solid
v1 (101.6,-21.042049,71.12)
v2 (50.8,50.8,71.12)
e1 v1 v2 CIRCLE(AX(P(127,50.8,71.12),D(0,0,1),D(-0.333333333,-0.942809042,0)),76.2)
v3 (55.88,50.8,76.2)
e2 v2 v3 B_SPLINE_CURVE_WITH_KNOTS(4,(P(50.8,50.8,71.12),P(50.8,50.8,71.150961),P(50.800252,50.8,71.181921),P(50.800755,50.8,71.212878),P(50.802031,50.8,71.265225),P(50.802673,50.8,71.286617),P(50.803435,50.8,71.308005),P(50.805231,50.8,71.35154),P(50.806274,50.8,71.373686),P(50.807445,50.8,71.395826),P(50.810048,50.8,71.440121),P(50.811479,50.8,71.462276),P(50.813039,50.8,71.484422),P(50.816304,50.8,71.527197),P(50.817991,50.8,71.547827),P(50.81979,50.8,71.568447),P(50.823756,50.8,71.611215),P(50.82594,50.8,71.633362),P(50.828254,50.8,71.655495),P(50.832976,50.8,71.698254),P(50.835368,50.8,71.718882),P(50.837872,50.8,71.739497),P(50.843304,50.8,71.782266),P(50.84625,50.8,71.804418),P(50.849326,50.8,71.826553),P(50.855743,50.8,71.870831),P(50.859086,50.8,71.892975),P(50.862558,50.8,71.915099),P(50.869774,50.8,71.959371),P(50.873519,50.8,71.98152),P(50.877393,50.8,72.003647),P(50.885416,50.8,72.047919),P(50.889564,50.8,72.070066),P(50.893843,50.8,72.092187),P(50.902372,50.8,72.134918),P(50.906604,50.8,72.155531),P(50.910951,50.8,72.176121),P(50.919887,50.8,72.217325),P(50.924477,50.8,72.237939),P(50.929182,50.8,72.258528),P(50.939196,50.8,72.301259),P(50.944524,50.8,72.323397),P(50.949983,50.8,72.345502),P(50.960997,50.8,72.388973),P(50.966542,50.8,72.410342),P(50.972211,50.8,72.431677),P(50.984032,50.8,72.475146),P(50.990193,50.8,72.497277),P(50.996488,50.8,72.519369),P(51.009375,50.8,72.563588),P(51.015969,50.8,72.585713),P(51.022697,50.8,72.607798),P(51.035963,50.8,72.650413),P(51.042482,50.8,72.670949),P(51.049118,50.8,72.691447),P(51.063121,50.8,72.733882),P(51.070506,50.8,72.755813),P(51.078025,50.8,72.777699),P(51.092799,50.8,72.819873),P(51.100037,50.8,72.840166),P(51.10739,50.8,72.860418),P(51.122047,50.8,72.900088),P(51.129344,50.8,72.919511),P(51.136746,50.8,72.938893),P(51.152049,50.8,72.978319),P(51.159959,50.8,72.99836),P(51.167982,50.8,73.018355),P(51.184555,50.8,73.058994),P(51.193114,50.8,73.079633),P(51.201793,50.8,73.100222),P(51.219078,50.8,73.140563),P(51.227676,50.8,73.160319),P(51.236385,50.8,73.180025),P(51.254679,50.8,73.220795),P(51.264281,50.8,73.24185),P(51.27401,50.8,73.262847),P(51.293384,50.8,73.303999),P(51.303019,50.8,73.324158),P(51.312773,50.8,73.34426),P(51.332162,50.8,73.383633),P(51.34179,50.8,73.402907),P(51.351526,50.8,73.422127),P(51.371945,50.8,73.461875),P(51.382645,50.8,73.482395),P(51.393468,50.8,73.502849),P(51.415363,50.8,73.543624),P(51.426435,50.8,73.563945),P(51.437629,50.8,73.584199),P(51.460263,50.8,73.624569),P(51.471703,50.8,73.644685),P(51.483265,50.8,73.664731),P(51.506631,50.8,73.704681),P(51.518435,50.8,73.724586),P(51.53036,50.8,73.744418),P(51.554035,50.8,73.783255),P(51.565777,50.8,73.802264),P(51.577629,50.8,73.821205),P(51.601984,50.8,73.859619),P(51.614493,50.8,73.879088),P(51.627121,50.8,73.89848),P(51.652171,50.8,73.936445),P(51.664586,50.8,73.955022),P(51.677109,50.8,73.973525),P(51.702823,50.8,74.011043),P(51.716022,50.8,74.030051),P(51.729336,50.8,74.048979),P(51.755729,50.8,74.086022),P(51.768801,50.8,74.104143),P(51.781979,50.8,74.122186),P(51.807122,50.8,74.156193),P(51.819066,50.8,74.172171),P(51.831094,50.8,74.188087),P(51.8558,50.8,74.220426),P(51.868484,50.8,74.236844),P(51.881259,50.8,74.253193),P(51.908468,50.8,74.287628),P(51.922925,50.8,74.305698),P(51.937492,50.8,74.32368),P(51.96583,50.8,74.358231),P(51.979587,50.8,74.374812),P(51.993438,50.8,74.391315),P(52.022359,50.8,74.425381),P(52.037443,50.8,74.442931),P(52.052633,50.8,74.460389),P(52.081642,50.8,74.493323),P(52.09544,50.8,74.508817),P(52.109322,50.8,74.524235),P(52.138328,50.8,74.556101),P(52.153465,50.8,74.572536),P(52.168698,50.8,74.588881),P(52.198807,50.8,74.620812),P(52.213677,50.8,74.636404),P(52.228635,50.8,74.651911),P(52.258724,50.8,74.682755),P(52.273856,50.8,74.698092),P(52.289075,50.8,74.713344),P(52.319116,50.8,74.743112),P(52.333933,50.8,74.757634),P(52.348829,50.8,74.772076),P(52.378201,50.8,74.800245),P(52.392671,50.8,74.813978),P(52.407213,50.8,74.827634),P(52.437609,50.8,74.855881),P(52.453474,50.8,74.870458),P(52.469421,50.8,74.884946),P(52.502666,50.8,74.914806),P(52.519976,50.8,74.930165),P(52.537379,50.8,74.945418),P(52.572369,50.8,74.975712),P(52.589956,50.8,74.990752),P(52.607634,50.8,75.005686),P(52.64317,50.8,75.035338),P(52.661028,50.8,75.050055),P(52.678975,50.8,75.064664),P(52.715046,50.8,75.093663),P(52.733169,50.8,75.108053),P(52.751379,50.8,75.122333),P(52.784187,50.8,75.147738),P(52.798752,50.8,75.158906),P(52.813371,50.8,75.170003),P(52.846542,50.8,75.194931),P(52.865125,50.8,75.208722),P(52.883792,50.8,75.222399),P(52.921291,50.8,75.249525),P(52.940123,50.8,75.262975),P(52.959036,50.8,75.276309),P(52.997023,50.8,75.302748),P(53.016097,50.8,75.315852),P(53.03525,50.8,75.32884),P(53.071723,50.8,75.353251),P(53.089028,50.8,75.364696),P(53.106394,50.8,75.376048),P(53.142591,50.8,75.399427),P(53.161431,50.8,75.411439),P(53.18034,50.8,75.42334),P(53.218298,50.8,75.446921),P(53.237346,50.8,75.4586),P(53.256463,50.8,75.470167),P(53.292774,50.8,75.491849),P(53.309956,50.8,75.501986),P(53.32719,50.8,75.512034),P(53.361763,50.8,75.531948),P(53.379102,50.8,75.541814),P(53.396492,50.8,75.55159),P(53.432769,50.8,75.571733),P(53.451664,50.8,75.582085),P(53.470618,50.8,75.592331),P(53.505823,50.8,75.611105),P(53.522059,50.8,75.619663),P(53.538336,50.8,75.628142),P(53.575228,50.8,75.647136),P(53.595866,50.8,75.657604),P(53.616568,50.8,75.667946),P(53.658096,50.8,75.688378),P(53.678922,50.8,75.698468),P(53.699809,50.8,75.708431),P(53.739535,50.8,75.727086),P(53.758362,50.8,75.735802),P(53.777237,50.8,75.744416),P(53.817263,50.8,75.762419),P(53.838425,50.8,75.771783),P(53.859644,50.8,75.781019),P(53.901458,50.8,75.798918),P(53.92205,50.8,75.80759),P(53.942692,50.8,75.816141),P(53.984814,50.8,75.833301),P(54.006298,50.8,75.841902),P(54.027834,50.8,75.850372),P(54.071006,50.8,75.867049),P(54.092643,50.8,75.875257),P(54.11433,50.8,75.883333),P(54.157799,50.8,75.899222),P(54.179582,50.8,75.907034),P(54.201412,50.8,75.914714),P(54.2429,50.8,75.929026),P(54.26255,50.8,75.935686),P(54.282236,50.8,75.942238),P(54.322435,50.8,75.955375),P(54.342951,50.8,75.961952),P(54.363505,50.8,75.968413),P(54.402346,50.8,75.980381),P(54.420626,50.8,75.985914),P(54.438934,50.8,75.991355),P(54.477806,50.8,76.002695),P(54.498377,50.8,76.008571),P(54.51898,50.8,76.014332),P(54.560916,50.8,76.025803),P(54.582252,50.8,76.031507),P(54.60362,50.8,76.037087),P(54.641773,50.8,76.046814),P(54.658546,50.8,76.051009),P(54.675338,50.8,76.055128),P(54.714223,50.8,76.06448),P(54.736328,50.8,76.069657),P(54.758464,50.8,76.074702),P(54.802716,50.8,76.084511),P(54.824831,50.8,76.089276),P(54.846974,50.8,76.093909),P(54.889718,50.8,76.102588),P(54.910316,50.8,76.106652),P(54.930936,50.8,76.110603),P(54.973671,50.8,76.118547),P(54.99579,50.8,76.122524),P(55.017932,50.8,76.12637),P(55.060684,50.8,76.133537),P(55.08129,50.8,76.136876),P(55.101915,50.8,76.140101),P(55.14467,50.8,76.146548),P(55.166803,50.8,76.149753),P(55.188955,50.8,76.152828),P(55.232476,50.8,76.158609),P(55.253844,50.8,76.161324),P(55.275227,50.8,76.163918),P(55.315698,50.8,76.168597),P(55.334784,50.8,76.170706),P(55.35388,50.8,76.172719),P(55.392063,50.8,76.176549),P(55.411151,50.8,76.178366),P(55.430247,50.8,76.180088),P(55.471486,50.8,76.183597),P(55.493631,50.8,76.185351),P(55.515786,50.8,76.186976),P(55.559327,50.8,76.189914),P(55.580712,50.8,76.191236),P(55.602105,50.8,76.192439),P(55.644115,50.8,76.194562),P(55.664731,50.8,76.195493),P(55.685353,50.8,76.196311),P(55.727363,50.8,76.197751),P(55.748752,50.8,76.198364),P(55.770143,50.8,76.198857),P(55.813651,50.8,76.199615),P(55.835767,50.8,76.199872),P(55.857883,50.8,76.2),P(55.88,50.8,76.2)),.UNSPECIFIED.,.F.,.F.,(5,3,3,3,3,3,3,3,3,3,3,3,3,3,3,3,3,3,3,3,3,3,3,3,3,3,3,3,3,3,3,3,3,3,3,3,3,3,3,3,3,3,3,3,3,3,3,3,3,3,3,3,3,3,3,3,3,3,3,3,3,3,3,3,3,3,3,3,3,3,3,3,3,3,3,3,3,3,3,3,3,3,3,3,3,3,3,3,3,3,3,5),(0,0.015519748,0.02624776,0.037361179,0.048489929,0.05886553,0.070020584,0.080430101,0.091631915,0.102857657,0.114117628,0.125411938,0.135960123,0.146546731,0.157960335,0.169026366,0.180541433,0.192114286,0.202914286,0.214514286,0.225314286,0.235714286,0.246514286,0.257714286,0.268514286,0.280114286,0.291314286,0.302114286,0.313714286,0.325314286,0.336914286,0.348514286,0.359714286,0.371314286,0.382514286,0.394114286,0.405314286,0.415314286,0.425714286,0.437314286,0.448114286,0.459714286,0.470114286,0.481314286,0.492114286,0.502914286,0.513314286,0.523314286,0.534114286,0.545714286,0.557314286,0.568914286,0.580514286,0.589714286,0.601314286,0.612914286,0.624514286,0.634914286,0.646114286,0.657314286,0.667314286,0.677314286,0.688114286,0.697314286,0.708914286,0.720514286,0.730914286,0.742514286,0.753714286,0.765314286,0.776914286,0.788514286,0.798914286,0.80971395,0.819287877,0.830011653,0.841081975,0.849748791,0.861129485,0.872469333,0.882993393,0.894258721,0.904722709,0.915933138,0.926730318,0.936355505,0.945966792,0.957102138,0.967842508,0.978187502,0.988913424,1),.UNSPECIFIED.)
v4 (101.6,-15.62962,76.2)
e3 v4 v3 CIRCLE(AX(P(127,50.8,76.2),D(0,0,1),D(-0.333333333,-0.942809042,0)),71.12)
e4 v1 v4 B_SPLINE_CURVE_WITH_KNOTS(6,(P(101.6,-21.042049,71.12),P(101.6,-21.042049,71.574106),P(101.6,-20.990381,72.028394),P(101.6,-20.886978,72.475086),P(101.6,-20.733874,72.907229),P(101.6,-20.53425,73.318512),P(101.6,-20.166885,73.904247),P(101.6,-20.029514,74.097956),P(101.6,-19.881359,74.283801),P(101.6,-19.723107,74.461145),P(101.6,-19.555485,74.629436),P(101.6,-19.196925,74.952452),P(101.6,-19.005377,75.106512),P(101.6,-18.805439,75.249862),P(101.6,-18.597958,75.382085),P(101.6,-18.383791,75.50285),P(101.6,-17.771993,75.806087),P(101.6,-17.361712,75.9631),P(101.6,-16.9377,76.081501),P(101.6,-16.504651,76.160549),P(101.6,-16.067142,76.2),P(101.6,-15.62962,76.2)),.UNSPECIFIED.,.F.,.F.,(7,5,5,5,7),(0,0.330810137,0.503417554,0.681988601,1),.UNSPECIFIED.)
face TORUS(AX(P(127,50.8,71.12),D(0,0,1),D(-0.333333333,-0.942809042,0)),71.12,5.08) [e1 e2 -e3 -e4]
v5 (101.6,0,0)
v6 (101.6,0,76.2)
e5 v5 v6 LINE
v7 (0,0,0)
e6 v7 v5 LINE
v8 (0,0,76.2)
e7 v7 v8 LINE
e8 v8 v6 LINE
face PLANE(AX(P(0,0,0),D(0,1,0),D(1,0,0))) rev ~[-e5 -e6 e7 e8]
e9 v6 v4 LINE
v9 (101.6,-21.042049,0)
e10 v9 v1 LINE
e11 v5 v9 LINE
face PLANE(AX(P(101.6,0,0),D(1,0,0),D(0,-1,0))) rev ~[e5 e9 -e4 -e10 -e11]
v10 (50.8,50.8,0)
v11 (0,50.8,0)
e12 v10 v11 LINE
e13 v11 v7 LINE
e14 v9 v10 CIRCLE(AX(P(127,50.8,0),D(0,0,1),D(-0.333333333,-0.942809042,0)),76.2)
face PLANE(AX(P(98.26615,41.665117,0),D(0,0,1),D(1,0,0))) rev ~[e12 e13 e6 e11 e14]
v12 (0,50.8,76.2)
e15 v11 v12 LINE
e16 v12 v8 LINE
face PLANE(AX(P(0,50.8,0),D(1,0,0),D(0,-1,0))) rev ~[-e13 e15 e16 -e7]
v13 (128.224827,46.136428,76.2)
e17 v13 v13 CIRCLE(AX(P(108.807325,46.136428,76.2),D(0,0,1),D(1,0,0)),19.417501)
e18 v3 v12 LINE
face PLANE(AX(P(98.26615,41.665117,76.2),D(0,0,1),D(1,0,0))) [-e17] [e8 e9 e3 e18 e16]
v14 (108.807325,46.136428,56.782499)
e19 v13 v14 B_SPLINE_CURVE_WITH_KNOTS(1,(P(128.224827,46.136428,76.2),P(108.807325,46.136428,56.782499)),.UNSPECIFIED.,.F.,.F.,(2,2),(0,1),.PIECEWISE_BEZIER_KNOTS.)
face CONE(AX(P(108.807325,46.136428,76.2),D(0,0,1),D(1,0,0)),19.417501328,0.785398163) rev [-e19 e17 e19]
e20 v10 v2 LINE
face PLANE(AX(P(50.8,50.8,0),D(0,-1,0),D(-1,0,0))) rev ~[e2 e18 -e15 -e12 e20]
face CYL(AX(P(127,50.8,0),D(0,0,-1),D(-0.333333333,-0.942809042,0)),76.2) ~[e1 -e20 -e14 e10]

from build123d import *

# Parameters (mm, degrees)
F1_DEPTH = 76.2
F2_R     = 5.08
F3_R     = 19.4175013285


# Not quite as in the source:
# - an extrude whose draft closes it to a point is written as a loft to that point


with BuildPart() as f1:
    # F0 (on Top) → F1 (new body)
    with BuildSketch(Plane.XY):
        with BuildLine():
            Line((0, 50.8), (0, 0))
            Line((0, 0), (101.6, 0))
            Line((101.6, 0), (101.6, -21.0420489686))
            ThreePointArc((101.6, -21.0420489686), (189.2170394667, 94.7940905122), (50.8, 50.8))
            Line((50.8, 50.8), (0, 50.8))
        make_face()
    extrude(amount=F1_DEPTH)

    # F2
    f2_edges = [f1.edges().sort_by_distance(p)[0] for p in [
        (189.217039, 94.794091, 76.2),
    ]]
    fillet(f2_edges, radius=F2_R)

    # F3 (on face) → F4 section 0
    with BuildSketch(Plane.XY.offset(76.2), mode=Mode.PRIVATE) as f4_s0:
        with Locations((108.8073253632, 46.1364276707)):
            Circle(F3_R)
    loft([f4_s0.sketch, Vertex(108.8073253632, 46.1364276707, 56.7824986715)], ruled=True, mode=Mode.SUBTRACT)


solid = f1.part
